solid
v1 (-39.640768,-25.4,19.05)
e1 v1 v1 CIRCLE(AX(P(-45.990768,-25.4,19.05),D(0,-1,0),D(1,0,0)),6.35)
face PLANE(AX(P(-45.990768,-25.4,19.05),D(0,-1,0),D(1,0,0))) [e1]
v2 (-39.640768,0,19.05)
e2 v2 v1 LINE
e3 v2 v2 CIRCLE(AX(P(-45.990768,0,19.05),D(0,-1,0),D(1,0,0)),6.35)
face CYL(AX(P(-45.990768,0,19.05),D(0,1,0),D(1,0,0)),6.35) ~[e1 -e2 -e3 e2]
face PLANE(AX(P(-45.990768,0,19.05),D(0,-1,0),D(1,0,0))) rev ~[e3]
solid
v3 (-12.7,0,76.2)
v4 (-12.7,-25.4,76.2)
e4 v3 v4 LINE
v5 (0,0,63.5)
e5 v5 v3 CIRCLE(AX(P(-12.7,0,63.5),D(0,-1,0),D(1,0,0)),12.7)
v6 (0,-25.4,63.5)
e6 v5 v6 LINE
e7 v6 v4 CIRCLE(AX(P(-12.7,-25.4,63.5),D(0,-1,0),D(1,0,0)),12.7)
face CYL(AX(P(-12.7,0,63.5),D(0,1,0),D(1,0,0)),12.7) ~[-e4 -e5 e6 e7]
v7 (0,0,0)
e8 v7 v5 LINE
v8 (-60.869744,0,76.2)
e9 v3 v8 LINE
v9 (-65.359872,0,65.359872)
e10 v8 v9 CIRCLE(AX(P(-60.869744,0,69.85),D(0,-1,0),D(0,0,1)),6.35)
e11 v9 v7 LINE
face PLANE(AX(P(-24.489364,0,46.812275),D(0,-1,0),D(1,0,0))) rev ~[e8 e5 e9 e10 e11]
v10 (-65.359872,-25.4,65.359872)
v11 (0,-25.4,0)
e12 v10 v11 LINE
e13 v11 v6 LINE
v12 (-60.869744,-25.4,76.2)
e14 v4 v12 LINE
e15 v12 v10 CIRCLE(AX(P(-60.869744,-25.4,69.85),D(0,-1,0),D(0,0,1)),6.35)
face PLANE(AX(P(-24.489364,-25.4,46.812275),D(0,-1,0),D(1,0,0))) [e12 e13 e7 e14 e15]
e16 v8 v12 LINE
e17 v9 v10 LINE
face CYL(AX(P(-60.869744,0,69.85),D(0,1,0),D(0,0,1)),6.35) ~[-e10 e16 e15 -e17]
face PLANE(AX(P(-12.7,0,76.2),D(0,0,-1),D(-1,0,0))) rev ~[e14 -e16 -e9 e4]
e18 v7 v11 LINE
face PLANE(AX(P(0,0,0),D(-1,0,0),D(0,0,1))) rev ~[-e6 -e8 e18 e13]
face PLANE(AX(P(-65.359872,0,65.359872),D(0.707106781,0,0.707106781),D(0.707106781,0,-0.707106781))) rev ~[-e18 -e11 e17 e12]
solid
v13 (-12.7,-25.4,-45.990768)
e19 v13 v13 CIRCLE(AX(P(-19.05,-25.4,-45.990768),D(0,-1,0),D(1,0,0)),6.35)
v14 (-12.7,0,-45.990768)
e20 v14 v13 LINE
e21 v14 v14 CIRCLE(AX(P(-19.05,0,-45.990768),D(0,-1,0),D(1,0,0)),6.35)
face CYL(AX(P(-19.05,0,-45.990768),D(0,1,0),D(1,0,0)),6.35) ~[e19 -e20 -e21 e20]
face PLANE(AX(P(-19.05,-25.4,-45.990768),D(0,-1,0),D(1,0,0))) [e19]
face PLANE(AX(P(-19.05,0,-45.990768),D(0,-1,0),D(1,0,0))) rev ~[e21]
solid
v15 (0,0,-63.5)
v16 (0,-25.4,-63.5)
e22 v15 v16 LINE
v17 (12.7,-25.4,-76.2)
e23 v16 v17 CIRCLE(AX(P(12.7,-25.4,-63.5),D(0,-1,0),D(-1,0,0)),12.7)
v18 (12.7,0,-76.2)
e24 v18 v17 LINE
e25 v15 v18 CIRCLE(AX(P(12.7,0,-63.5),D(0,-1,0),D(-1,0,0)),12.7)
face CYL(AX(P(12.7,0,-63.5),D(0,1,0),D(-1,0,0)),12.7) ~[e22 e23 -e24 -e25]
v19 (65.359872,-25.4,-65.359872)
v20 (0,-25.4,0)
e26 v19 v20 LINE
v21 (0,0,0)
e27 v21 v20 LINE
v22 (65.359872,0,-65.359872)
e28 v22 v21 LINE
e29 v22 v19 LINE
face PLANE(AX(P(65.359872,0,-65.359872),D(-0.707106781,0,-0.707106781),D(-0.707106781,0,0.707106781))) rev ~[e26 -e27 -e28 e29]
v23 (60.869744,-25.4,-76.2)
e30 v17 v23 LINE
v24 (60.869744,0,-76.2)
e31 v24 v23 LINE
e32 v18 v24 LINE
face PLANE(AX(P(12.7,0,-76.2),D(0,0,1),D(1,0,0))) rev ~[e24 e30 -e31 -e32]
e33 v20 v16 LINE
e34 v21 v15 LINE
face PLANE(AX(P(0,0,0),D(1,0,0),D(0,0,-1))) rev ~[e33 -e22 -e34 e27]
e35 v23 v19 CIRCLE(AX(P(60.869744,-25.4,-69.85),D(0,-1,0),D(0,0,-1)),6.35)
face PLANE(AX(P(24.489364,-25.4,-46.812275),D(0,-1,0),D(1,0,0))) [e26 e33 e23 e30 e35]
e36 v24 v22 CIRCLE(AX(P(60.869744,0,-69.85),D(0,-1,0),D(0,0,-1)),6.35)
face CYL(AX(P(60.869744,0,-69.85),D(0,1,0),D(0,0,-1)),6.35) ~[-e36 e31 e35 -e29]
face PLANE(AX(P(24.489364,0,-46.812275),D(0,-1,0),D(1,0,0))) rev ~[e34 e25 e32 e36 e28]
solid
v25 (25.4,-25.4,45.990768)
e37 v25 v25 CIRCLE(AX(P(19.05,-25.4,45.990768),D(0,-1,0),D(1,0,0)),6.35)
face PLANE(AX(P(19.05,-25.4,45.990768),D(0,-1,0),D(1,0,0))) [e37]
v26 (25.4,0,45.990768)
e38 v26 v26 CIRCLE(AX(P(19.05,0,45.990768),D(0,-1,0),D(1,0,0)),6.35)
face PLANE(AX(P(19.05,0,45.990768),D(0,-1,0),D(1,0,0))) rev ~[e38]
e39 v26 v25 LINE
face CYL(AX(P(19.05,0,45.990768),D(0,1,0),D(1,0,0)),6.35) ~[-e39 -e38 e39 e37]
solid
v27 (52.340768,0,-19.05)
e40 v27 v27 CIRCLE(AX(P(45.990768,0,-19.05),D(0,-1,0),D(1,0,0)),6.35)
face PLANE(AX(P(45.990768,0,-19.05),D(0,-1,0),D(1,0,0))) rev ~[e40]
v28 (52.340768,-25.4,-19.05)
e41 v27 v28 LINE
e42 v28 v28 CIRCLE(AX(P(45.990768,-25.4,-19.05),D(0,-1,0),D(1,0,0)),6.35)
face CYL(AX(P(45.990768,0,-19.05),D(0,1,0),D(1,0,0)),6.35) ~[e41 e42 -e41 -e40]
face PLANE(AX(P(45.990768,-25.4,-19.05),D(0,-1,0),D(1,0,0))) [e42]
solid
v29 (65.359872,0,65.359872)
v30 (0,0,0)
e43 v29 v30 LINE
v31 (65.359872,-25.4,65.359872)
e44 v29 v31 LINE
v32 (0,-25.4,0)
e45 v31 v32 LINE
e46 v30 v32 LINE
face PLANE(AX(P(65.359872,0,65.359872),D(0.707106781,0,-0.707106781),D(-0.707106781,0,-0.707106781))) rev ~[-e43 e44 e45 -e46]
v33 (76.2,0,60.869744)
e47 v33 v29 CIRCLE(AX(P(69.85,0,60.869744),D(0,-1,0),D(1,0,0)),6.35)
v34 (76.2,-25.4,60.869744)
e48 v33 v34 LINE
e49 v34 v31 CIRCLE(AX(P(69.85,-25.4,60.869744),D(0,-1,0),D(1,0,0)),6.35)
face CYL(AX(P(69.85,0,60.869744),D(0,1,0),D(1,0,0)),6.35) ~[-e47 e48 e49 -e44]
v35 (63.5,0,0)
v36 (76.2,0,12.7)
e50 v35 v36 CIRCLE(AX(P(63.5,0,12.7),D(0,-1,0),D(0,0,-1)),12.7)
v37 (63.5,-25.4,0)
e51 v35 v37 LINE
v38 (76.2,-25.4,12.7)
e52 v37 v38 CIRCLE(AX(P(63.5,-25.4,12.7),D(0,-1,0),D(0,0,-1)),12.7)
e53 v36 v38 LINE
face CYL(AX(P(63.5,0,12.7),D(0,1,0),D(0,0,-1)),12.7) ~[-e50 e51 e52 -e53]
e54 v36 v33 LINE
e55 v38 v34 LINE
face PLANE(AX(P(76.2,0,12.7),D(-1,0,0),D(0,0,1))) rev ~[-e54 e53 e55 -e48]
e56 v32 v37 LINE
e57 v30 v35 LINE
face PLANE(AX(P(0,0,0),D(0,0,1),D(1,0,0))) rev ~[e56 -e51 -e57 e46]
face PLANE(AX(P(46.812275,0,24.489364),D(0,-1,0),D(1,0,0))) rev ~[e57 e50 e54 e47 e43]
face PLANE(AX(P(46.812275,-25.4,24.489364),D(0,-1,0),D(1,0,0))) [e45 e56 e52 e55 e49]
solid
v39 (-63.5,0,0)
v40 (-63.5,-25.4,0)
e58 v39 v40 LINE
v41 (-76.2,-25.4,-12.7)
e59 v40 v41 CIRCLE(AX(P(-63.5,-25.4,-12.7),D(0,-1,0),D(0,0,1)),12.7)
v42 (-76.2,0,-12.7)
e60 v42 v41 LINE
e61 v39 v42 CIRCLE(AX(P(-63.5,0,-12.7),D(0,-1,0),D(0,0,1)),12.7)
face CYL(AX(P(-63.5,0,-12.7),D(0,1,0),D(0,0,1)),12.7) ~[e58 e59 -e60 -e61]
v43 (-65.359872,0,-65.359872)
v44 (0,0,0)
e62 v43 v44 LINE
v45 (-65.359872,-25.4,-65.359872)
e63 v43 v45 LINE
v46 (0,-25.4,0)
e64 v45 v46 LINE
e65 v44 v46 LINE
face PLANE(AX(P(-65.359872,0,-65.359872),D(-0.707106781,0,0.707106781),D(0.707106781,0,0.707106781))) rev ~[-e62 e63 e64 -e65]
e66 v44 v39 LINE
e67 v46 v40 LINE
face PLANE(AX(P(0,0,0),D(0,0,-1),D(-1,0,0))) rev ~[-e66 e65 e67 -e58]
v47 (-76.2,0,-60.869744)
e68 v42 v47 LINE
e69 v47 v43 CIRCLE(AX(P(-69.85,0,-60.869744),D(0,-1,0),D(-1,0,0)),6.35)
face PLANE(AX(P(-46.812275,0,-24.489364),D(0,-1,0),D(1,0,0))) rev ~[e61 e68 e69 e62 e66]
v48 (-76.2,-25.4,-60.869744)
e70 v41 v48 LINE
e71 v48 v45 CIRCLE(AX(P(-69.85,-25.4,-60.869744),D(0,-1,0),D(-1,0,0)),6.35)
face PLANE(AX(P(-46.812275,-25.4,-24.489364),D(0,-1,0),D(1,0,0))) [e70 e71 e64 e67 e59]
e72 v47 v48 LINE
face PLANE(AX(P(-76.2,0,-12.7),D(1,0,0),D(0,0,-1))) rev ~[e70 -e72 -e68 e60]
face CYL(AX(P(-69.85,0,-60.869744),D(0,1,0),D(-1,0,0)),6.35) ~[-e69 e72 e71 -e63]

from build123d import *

# Parameters (mm, degrees)
F1_DEPTH = 25.4
F0_R     = 6.35


# Not quite as in the source:
# - the program builds the solid bodies; features that only make, move or delete a surface that nothing else refers to are left out


with BuildPart() as f1:
    # F0 (on Front) → F1 (new body)
    with BuildSketch(Plane.XZ):
        with BuildLine():
            Line((65.3598719395, 65.3598719395), (0, 0))
            Line((0, 0), (63.5, 0))
            ThreePointArc((63.5, 0), (72.4802561211, 3.7197438789), (76.2, 12.7))
            Line((76.2, 12.7), (76.2, 60.8697438789))
            ThreePointArc((76.2, 60.8697438789), (72.2800397955, 66.7363789104), (65.3598719395, 65.3598719395))
        make_face()
    extrude(amount=F1_DEPTH)


with BuildPart() as f1b:
    # F0 (on Front) → F1, piece 2 (new body)
    with BuildSketch(Plane.XZ):
        with BuildLine():
            Line((-65.3598719395, 65.3598719395), (0, 0))
            Line((0, 0), (0, 63.5))
            ThreePointArc((0, 63.5), (-3.7197438789, 72.4802561211), (-12.7, 76.2))
            Line((-12.7, 76.2), (-60.8697438789, 76.2))
            ThreePointArc((-60.8697438789, 76.2), (-66.7363789104, 72.2800397955), (-65.3598719395, 65.3598719395))
        make_face()
    extrude(amount=F1_DEPTH)


with BuildPart() as f1c:
    # F0 (on Front) → F1, piece 3 (new body)
    with BuildSketch(Plane.XZ):
        with BuildLine():
            Line((-65.3598719395, -65.3598719395), (0, 0))
            Line((0, 0), (-63.5, 0))
            ThreePointArc((-63.5, 0), (-72.4802561211, -3.7197438789), (-76.2, -12.7))
            Line((-76.2, -12.7), (-76.2, -60.8697438789))
            ThreePointArc((-76.2, -60.8697438789), (-72.2800397955, -66.7363789104), (-65.3598719395, -65.3598719395))
        make_face()
    extrude(amount=F1_DEPTH)


with BuildPart() as f1d:
    # F0 (on Front) → F1, piece 4 (new body)
    with BuildSketch(Plane.XZ):
        with BuildLine():
            Line((65.3598719395, -65.3598719395), (0, 0))
            Line((0, 0), (0, -63.5))
            ThreePointArc((0, -63.5), (3.7197438789, -72.4802561211), (12.7, -76.2))
            Line((12.7, -76.2), (60.8697438789, -76.2))
            ThreePointArc((60.8697438789, -76.2), (66.7363789104, -72.2800397955), (65.3598719395, -65.3598719395))
        make_face()
    extrude(amount=F1_DEPTH)


with BuildPart() as f1e:
    # F0 (on Front) → F1, piece 5 (new body)
    with BuildSketch(Plane.XZ):
        with Locations((-45.9907683632, 19.05)):
            Circle(F0_R)
    extrude(amount=F1_DEPTH)


with BuildPart() as f1f:
    # F0 (on Front) → F1, piece 6 (new body)
    with BuildSketch(Plane.XZ):
        with Locations((19.05, 45.9907683632)):
            Circle(F0_R)
    extrude(amount=F1_DEPTH)


with BuildPart() as f1g:
    # F0 (on Front) → F1, piece 7 (new body)
    with BuildSketch(Plane.XZ):
        with Locations((45.9907683632, -19.05)):
            Circle(F0_R)
    extrude(amount=F1_DEPTH)


with BuildPart() as f1h:
    # F0 (on Front) → F1, piece 8 (new body)
    with BuildSketch(Plane.XZ):
        with Locations((-19.05, -45.9907683632)):
            Circle(F0_R)
    extrude(amount=F1_DEPTH)


solid = Compound([f1.part, f1b.part, f1c.part, f1d.part, f1e.part, f1f.part, f1g.part, f1h.part])
